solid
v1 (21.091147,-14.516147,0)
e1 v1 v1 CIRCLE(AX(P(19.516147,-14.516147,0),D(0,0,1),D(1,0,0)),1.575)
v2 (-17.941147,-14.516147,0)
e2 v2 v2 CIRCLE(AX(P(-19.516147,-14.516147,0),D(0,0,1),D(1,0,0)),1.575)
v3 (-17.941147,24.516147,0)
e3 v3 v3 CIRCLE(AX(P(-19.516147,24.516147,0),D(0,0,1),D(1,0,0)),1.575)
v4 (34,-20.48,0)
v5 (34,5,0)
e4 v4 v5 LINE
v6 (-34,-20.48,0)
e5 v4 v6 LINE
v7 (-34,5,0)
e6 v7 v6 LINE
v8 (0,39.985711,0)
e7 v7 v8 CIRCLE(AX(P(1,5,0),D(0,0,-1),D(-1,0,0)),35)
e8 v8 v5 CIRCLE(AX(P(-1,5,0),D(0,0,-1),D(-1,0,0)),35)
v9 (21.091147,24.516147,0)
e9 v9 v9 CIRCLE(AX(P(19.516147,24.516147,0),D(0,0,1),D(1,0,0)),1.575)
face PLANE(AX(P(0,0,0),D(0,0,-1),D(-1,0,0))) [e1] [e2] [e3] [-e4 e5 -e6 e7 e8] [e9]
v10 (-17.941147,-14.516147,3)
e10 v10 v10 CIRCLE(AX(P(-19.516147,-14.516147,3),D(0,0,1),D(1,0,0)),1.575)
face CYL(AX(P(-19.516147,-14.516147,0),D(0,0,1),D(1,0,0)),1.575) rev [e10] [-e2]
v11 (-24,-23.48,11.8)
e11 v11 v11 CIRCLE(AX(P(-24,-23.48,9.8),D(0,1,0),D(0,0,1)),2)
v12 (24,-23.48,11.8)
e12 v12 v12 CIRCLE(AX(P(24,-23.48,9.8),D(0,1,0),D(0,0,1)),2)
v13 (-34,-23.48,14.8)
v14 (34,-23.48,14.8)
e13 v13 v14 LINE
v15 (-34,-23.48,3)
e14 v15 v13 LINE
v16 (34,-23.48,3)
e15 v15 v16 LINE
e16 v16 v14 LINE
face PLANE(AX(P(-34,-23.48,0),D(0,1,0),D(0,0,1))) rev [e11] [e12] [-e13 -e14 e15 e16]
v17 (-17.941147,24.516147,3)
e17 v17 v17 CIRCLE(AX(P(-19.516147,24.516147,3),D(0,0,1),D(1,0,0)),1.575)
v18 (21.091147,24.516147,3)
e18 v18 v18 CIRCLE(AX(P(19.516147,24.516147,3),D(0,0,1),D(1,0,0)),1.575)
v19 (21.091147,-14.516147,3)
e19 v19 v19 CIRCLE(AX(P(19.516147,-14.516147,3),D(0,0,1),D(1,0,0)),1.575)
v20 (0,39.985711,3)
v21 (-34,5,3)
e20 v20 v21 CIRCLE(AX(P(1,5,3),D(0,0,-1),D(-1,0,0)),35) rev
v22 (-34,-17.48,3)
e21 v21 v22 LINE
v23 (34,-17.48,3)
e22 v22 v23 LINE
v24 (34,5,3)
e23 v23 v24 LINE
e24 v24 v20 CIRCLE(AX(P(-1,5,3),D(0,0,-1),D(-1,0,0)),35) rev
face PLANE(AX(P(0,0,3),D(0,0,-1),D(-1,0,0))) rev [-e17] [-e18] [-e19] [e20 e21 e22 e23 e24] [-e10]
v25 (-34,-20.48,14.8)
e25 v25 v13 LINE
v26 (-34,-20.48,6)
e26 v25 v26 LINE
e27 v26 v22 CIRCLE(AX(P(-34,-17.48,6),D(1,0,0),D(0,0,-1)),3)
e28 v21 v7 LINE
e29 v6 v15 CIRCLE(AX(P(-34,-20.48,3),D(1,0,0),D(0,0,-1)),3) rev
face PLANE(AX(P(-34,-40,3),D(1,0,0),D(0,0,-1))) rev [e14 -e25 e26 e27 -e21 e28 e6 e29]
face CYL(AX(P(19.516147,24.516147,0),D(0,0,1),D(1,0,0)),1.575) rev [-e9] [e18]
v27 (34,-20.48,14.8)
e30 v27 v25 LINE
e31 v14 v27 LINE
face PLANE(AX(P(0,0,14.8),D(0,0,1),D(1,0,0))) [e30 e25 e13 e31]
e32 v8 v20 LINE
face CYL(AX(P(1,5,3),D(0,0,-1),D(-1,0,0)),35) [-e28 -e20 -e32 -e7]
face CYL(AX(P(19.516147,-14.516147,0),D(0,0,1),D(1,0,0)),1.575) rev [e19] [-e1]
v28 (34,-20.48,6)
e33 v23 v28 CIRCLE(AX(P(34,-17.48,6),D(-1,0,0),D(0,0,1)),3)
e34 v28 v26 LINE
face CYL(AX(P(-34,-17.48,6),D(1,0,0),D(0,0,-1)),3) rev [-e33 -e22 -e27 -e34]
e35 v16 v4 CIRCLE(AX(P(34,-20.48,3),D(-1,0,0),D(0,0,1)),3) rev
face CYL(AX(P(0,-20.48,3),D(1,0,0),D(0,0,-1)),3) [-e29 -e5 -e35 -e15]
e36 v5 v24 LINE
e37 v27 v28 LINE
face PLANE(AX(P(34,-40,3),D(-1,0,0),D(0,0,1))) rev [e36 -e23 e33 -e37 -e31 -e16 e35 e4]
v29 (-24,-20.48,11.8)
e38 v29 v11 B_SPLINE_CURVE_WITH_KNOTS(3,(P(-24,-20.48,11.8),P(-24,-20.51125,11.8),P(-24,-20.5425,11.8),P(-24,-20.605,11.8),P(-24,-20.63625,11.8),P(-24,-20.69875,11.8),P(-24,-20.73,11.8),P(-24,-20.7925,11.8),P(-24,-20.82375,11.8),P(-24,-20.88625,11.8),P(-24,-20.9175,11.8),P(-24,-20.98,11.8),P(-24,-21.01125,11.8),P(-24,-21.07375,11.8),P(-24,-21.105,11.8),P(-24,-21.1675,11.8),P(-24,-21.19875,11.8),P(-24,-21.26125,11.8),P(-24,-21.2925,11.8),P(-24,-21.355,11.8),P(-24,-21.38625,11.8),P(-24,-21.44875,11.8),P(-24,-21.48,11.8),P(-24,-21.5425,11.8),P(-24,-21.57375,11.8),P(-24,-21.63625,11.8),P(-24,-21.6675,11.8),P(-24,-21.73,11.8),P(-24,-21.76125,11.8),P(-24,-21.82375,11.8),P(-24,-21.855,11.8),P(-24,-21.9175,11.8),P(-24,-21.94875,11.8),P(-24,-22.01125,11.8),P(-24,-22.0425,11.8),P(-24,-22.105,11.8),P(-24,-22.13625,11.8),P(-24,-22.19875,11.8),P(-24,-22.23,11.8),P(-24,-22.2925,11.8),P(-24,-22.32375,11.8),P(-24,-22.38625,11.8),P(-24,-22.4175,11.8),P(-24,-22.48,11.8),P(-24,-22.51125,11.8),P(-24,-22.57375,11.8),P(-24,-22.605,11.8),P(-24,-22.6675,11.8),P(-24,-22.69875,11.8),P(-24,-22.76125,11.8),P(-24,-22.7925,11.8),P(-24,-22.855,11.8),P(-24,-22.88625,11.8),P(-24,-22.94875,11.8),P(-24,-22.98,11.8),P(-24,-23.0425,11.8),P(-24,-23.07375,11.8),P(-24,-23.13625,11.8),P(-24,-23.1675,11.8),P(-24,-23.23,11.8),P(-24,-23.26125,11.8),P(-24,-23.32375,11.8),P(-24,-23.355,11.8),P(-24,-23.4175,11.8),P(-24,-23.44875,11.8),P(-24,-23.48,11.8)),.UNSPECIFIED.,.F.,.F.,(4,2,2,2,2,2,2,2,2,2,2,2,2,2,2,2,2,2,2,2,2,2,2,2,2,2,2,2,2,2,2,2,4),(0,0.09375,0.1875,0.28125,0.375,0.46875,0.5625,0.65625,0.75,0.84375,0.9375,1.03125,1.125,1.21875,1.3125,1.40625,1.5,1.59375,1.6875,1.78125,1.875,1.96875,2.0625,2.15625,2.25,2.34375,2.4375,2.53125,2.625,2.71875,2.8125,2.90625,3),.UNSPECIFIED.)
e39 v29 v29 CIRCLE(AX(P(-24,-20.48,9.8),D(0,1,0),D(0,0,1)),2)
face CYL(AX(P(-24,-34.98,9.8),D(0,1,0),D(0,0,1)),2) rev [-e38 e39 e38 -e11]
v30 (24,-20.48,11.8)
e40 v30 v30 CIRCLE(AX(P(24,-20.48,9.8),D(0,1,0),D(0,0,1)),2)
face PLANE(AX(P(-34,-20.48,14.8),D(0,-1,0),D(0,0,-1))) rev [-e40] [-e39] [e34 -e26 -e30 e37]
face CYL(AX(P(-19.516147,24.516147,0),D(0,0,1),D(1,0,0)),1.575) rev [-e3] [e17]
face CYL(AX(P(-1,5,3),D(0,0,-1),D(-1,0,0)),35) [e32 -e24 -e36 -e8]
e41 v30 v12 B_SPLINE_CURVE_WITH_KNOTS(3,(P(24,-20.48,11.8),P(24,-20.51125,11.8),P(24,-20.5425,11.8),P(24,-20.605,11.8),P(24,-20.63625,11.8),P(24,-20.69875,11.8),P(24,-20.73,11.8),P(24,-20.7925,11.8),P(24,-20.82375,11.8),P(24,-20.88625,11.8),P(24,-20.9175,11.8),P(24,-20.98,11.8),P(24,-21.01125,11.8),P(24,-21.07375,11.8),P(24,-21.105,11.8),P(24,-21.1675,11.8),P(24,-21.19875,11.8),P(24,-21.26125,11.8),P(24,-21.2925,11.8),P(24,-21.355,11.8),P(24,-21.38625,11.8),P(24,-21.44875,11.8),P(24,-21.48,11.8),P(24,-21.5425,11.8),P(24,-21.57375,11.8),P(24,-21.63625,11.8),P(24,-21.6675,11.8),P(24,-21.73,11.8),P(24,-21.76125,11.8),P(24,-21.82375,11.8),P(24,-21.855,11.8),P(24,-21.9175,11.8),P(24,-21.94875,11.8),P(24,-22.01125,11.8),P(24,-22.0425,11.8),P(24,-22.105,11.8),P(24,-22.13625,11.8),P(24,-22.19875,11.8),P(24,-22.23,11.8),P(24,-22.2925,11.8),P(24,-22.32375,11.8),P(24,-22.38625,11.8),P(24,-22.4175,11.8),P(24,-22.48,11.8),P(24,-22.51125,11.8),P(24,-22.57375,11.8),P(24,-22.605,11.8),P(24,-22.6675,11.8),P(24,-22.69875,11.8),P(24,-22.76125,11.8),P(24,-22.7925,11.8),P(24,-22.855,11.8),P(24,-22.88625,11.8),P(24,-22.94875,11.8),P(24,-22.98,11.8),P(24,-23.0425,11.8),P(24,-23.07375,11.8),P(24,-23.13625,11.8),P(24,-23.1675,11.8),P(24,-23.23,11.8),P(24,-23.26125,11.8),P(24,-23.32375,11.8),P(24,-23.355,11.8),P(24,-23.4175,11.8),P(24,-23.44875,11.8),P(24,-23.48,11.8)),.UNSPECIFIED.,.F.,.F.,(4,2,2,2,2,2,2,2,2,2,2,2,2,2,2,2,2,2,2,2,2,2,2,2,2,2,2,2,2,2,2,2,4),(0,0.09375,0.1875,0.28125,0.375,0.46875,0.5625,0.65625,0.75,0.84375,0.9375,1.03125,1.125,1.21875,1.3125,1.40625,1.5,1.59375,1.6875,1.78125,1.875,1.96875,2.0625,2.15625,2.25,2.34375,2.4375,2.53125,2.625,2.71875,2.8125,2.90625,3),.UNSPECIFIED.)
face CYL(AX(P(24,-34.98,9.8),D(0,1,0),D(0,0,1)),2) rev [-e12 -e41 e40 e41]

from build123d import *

# Parameters (mm, degrees)
SKETCH_1_W          = 68
SKETCH_1_H          = 80
EXTRUDE_1_DEPTH     = 3
SKETCH_2_R          = 1.575
CUT_EXTRUDE_1_DEPTH = 53.583267301
SKETCH_4_W          = 68
SKETCH_4_H          = 16.52
CUT_EXTRUDE_2_DEPTH = 53.583267301
SKETCH_5_W          = 68
SKETCH_5_H          = 3
EXTRUDE_2_DEPTH     = 11.8
FILLET_1_R          = 3
SKETCH_6_R          = 2
CUT_EXTRUDE_3_DEPTH = 14.5
FILLET_2_R          = 35


with BuildPart() as part:
    # 草图1 → 凸台-拉伸1 (new body)
    with BuildSketch(Plane.XY):
        Rectangle(SKETCH_1_W, SKETCH_1_H)
    extrude(amount=EXTRUDE_1_DEPTH)

    # 草图2 → 切除-拉伸1 (cut, through all)
    with BuildSketch(Plane.XY.offset(3)):
        with Locations((-19.516147161, 24.516147161)):
            Circle(SKETCH_2_R)
        with Locations((19.516147161, 24.516147161)):
            Circle(SKETCH_2_R)
        with Locations((-19.516147161, -14.516147161)):
            Circle(SKETCH_2_R)
        with Locations((19.516147161, -14.516147161)):
            Circle(SKETCH_2_R)
    extrude(amount=-CUT_EXTRUDE_1_DEPTH, mode=Mode.SUBTRACT)

    # 草图4 → 切除-拉伸2 (cut, through all)
    with BuildSketch(Plane.XY.offset(3)):
        with Locations((0, -31.74)):
            Rectangle(SKETCH_4_W, SKETCH_4_H)
    extrude(amount=-CUT_EXTRUDE_2_DEPTH, mode=Mode.SUBTRACT)

    # 草图5 → 凸台-拉伸2 (add)
    with BuildSketch(Plane.XY.offset(3)):
        with Locations((0, -21.98)):
            Rectangle(SKETCH_5_W, SKETCH_5_H)
    extrude(amount=EXTRUDE_2_DEPTH)

    # 圆角1
    fillet_1_edges = [part.edges().sort_by_distance(p)[0] for p in [
        (0, -23.48, 0),
        (0, -20.48, 3),
    ]]
    fillet(fillet_1_edges, radius=FILLET_1_R)

    # 草图6 → 切除-拉伸3 (cut)
    with BuildSketch(Plane(origin=(0, -20.48, 0), x_dir=(1, 0, 0), z_dir=(0, 1, 0))):
        with Locations(Location((24, -9.8, 0), (0, 0, 270))):
            Circle(SKETCH_6_R)
        with Locations(Location((-24, -9.8, 0), (0, 0, 270))):
            Circle(SKETCH_6_R)
    extrude(amount=-CUT_EXTRUDE_3_DEPTH, mode=Mode.SUBTRACT)

    # 圆角2
    # the kernel refuses this fillet: 35 mm, written as the material it takes off along each edge
    with BuildSketch(Plane(origin=(34, 40, -87.5), x_dir=(-1, 0, 0), z_dir=(0, 0, 1)), Plane(origin=(-34, 40, -87.5), x_dir=(0, -1, 0), z_dir=(0, 0, 1))) as fillet_2_piece_1:
        with BuildLine():
            CenterArc((FILLET_2_R, FILLET_2_R), FILLET_2_R, 180, 90)
            Line((0, FILLET_2_R), (0, 0))
            Line((0, 0), (FILLET_2_R, 0))
        make_face()
    extrude(amount=178, mode=Mode.SUBTRACT)


solid = part.part
